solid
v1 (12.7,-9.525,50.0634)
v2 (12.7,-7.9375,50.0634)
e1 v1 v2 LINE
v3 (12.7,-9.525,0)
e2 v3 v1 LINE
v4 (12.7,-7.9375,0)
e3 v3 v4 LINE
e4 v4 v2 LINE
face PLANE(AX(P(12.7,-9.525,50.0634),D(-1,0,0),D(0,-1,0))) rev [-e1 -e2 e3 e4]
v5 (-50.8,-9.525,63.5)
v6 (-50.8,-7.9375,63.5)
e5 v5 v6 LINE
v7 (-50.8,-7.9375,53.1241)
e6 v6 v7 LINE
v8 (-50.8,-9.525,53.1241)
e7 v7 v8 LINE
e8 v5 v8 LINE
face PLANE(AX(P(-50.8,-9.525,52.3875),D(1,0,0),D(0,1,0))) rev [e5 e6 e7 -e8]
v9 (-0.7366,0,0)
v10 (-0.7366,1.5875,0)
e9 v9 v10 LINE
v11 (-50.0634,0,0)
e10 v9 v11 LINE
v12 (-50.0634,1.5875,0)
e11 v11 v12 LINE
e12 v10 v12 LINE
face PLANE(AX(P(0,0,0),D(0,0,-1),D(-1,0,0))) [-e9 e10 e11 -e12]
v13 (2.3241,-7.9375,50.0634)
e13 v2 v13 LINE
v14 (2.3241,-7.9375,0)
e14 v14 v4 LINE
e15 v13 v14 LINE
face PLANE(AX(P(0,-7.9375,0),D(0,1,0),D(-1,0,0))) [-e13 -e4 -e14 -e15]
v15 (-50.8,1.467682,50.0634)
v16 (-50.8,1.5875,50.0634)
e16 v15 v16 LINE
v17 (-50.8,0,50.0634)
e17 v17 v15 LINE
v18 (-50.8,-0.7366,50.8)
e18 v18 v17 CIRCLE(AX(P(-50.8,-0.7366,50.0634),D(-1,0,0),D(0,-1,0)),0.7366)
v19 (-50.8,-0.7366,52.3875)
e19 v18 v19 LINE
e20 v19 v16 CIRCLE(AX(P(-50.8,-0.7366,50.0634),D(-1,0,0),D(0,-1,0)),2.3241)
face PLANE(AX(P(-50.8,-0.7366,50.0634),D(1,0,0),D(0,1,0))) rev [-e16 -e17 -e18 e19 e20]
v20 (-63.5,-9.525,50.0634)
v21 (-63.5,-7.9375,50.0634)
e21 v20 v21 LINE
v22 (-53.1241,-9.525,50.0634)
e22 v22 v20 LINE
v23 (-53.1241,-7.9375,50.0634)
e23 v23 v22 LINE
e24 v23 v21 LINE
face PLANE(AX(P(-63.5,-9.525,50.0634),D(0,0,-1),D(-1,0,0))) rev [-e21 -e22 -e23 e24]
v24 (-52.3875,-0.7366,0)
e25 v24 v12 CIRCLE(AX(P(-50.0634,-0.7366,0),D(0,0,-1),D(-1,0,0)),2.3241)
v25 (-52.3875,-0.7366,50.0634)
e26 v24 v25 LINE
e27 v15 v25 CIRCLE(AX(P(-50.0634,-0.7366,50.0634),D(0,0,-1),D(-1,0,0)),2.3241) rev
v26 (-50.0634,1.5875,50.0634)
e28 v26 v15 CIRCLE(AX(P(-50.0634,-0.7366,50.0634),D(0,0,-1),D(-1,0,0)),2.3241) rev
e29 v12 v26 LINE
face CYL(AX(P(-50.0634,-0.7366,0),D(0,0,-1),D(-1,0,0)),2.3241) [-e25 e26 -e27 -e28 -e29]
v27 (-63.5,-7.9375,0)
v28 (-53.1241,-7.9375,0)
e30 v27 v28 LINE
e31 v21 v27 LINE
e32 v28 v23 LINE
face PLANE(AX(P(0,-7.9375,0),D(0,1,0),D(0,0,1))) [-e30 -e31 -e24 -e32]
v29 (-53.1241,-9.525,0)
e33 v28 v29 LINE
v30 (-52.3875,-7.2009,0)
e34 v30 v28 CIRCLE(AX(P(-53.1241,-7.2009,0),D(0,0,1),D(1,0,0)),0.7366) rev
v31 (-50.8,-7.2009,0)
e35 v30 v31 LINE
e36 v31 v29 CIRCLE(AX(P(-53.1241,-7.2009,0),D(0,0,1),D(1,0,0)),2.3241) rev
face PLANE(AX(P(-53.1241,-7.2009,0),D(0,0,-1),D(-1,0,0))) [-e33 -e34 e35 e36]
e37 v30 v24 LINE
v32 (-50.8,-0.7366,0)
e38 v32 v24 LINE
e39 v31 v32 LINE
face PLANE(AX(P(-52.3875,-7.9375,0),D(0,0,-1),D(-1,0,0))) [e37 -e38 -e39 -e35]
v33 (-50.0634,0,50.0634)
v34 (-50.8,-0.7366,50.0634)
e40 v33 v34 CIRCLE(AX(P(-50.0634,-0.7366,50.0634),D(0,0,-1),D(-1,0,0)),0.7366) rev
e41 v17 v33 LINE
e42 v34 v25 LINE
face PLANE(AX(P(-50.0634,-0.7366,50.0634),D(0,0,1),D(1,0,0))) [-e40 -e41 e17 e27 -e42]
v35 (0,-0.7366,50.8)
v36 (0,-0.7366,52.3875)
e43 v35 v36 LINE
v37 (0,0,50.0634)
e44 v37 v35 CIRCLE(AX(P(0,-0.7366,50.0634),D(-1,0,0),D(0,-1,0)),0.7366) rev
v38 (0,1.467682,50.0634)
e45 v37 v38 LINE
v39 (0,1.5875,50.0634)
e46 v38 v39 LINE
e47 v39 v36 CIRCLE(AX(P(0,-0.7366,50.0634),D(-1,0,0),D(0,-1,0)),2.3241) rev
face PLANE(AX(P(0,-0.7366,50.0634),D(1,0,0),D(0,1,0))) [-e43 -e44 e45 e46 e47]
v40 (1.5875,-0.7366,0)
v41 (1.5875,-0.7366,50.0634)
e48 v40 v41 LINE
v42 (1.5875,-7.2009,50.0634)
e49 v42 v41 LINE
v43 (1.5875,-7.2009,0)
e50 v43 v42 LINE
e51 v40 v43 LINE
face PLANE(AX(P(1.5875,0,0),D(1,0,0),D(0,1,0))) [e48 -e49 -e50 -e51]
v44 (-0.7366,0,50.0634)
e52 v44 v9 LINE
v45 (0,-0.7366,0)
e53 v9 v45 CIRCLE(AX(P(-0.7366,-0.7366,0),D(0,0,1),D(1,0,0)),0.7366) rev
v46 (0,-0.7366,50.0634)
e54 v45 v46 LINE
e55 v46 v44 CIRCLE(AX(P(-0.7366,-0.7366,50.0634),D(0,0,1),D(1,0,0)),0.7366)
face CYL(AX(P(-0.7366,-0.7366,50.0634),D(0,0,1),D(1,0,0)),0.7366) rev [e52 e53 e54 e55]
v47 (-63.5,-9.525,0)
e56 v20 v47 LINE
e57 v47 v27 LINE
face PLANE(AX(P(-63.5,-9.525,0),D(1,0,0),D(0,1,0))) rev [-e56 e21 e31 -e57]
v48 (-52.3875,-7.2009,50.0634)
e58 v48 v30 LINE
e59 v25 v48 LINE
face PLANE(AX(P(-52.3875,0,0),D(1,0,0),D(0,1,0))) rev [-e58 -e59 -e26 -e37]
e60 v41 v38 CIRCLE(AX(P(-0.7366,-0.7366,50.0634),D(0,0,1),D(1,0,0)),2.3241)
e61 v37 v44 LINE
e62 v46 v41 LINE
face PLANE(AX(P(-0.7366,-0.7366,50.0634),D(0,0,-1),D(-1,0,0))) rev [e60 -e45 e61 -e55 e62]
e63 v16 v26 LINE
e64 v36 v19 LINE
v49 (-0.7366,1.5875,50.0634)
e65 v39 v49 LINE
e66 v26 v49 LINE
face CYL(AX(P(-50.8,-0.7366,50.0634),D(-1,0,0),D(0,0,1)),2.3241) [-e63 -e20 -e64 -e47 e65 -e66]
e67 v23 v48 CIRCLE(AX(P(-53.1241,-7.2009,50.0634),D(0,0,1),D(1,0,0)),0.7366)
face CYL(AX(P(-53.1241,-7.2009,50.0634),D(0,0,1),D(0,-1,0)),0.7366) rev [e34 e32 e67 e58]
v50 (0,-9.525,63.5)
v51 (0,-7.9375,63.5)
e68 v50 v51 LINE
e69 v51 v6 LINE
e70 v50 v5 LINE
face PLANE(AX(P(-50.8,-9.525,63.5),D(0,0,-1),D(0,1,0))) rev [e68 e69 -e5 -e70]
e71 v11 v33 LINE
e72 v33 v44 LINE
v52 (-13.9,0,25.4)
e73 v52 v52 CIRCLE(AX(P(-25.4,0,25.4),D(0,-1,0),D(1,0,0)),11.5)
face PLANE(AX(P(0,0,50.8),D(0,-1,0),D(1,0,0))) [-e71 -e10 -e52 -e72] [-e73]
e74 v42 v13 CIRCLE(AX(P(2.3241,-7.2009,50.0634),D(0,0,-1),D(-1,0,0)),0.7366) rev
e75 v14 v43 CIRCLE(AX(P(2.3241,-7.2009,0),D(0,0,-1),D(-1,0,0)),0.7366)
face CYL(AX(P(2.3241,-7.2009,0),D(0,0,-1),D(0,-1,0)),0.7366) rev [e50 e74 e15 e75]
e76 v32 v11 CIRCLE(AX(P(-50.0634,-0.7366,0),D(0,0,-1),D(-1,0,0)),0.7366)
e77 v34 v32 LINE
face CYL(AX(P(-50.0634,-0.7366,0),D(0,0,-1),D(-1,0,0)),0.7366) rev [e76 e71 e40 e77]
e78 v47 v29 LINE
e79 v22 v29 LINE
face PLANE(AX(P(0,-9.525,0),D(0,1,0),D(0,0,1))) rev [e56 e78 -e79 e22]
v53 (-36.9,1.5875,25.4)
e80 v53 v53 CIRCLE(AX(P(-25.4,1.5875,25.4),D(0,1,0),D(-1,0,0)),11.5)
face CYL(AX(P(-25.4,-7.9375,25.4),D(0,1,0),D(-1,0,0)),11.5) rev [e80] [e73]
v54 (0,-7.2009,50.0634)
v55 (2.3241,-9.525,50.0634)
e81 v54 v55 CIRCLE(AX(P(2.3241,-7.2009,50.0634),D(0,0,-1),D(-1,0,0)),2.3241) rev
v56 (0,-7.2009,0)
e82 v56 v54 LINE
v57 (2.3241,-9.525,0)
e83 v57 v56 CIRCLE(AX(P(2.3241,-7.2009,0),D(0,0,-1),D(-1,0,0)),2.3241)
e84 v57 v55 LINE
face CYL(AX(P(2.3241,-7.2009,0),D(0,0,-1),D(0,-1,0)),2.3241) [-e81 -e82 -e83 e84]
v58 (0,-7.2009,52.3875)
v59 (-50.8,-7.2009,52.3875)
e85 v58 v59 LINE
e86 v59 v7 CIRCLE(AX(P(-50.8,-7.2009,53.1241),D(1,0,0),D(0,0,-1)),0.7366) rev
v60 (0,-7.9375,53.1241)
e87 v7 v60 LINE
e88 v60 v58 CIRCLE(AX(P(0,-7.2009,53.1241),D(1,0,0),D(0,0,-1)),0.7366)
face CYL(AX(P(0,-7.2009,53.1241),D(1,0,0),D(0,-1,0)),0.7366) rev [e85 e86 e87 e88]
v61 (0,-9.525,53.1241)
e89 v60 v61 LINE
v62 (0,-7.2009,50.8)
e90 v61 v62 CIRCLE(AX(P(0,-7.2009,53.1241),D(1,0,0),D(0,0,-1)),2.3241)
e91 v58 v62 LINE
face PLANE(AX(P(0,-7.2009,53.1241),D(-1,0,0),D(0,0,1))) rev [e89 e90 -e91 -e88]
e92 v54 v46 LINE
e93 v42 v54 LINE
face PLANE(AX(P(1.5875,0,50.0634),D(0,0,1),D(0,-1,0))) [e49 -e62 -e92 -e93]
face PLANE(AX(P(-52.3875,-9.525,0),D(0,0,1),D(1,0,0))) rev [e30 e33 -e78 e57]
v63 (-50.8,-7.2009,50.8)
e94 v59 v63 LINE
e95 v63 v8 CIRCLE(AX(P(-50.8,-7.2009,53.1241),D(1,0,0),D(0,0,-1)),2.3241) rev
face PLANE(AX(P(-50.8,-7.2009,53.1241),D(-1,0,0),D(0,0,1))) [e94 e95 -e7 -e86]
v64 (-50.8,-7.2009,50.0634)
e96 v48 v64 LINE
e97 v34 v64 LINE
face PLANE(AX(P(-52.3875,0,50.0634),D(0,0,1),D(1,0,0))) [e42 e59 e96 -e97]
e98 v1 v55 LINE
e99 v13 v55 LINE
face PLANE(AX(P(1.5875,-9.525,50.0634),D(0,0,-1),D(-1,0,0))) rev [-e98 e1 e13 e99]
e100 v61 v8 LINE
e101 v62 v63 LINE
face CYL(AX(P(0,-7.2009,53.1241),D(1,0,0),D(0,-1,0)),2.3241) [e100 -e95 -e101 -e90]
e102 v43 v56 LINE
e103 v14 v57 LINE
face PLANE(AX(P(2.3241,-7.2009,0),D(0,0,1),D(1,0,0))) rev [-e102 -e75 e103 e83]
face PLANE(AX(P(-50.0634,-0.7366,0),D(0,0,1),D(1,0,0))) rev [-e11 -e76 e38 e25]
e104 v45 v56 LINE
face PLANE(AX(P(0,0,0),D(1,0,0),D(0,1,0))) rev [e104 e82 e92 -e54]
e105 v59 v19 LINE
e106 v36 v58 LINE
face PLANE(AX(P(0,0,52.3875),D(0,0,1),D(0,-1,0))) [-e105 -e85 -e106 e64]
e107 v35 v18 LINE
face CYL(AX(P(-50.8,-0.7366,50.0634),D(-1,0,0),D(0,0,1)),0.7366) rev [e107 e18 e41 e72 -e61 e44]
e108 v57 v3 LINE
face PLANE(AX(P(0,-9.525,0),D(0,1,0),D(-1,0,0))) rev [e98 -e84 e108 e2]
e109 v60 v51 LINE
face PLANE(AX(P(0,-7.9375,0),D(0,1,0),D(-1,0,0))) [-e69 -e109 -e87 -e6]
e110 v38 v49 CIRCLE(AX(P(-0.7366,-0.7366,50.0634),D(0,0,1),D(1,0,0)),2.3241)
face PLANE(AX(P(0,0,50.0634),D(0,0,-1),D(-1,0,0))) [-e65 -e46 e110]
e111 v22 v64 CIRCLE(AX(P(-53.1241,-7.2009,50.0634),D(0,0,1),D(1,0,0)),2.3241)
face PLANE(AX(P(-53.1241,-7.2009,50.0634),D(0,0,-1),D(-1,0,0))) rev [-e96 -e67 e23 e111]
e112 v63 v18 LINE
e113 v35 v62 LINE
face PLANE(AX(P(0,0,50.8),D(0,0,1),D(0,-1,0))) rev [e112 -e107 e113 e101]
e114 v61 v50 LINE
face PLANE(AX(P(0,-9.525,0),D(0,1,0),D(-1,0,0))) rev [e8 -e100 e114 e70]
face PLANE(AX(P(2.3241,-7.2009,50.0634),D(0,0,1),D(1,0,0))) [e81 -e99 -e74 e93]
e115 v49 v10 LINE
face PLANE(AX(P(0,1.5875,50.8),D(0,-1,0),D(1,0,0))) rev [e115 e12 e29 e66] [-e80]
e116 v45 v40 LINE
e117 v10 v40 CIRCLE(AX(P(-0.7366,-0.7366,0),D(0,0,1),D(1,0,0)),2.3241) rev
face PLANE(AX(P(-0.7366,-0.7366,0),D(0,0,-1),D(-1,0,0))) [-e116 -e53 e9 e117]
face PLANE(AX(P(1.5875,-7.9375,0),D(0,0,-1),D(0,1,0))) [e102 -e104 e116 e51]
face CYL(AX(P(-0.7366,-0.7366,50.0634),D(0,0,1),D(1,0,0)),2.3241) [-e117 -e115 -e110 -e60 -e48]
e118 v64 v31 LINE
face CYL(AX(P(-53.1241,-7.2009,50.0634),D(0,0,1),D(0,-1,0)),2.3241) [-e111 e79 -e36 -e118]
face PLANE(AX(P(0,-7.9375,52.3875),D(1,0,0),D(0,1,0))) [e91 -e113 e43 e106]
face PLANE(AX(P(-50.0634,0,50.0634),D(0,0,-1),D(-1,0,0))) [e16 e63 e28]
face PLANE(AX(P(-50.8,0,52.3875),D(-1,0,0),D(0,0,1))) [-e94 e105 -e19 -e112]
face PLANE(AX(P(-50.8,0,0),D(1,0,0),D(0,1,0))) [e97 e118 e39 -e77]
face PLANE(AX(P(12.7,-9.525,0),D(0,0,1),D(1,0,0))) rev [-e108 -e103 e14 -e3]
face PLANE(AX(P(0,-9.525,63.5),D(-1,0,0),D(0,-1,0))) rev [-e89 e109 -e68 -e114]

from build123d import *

# Parameters (mm, degrees)
SKETCH6_W                      = 50.8
SKETCH6_H                      = 1.5875
BASE_FLANGE1_DEPTH             = 50.8
EDGE_FLANGE1_STRIP_W           = 7.8232
EDGE_FLANGE1_STRIP_H           = 1.5875
EDGE_FLANGE1_STRIP_CUT_DEPTH   = 50.8
EDGE_FLANGE1_DEPTH             = 50.8
SKETCH16_R                     = 11.5
CUT_EXTRUDE1_DEPTH             = 74.592226364
EDGE_FLANGE4_STRIP_W           = 7.8232
EDGE_FLANGE4_STRIP_H           = 1.5875
EDGE_FLANGE4_STRIP_CUT_DEPTH   = 50.0634
EDGE_FLANGE4_STRIP_2_W         = 7.8232
EDGE_FLANGE4_STRIP_2_H         = 1.5875
EDGE_FLANGE4_STRIP_CUT_2_DEPTH = 50.0634
EDGE_FLANGE4_DEPTH             = 50.0634
EDGE_FLANGE4_BEND_DEPTH        = 50.0634
EDGE_FLANGE5_STRIP_W           = 7.8232
EDGE_FLANGE5_STRIP_H           = 1.5875
EDGE_FLANGE5_STRIP_CUT_DEPTH   = 50.0634
EDGE_FLANGE5_STRIP_2_W         = 7.8232
EDGE_FLANGE5_STRIP_2_H         = 1.5875
EDGE_FLANGE5_STRIP_CUT_2_DEPTH = 50.0634
EDGE_FLANGE5_DEPTH             = 50.0634
EDGE_FLANGE5_BEND_DEPTH        = 50.0634
EDGE_FLANGE6_STRIP_W           = 7.8232
EDGE_FLANGE6_STRIP_H           = 1.5875
EDGE_FLANGE6_STRIP_CUT_DEPTH   = 50.8
EDGE_FLANGE6_DEPTH             = 50.8


# Sheet-metal steps are written as plain solids
with BuildPart() as part:
    # Sketch6 → Base-Flange1 (new body)
    with BuildSketch(Plane.XY):
        with Locations((-25.4, 0.79375)):
            Rectangle(SKETCH6_W, SKETCH6_H)
    extrude(amount=BASE_FLANGE1_DEPTH)

    # Edge-Flange1 strip (across the edge) → Edge-Flange1 strip cut (cut)
    with BuildSketch(Plane(origin=(0, 0, 50.8), x_dir=(0, 0, -1), z_dir=(-1, 0, 0))):
        with Locations((-3.175, -0.79375)):
            Rectangle(EDGE_FLANGE1_STRIP_W, EDGE_FLANGE1_STRIP_H)
    extrude(amount=EDGE_FLANGE1_STRIP_CUT_DEPTH, mode=Mode.SUBTRACT)

    # Edge-Flange1 section (across the edge) → Edge-Flange1 (add)
    with BuildSketch(Plane(origin=(0, 0, 50.8), x_dir=(0, 0, -1), z_dir=(-1, 0, 0))):
        with BuildLine():
            Line((-1.5875, 0.7366), (-1.5875, 7.9375))
            Line((-1.5875, 7.9375), (0, 7.9375))
            Line((0, 7.9375), (0, 0.7366))
            ThreePointArc((0, 0.7366), (0.215745145, 0.215745145), (0.7366, 0))
            Line((0.7366, 0), (0.7366, -1.5875))
            ThreePointArc((0.7366, -1.5875), (-0.90678687, -0.90678687), (-1.5875, 0.7366))
        make_face()
    extrude(amount=EDGE_FLANGE1_DEPTH)

    # Sketch16 → Cut-Extrude1 (cut, through all)
    with BuildSketch(Plane(origin=(0, 1.5875, 0), x_dir=(1, 0, 0), z_dir=(0, 1, 0))):
        with Locations(Location((-25.4, -25.4, 0), (0, 0, 180))):
            Circle(SKETCH16_R)
    extrude(amount=-CUT_EXTRUDE1_DEPTH, mode=Mode.SUBTRACT)

    # Edge-Flange4 strip (across the edge) → Edge-Flange4 strip cut (cut)
    with BuildSketch(Plane(origin=(0, 0, 0), x_dir=(-1, 0, 0), z_dir=(0, 0, 1))):
        with Locations((-3.175, -0.79375)):
            Rectangle(EDGE_FLANGE4_STRIP_W, EDGE_FLANGE4_STRIP_H)
    extrude(amount=EDGE_FLANGE4_STRIP_CUT_DEPTH, mode=Mode.SUBTRACT)

    # Edge-Flange4 strip 2 (across the edge) → Edge-Flange4 strip cut 2 (cut)
    with BuildSketch(Plane(origin=(-50.8, 0, 50.0634), x_dir=(1, 0, 0), z_dir=(0, 0, -1))):
        with Locations((-3.175, -0.79375)):
            Rectangle(EDGE_FLANGE4_STRIP_2_W, EDGE_FLANGE4_STRIP_2_H)
    extrude(amount=EDGE_FLANGE4_STRIP_CUT_2_DEPTH, mode=Mode.SUBTRACT)

    # Edge-Flange4 section (across the edge) → Edge-Flange4 (add)
    with BuildSketch(Plane(origin=(0, 0, 0), x_dir=(-1, 0, 0), z_dir=(0, 0, 1))):
        with BuildLine():
            Line((-1.5875, 0.7366), (-1.5875, 7.9375))
            Line((-1.5875, 7.9375), (0, 7.9375))
            Line((0, 7.9375), (0, 0.7366))
            ThreePointArc((0, 0.7366), (0.215745145, 0.215745145), (0.7366, 0))
            Line((0.7366, 0), (0.7366, -1.5875))
            ThreePointArc((0.7366, -1.5875), (-0.90678687, -0.90678687), (-1.5875, 0.7366))
        make_face()
    extrude(amount=EDGE_FLANGE4_DEPTH)

    # Edge-Flange4 section 2 (across the edge) → Edge-Flange4 bend (add)
    with BuildSketch(Plane(origin=(-50.8, 0, 50.0634), x_dir=(1, 0, 0), z_dir=(0, 0, -1))):
        with BuildLine():
            Line((-1.5875, 0.7366), (-1.5875, 7.9375))
            Line((-1.5875, 7.9375), (0, 7.9375))
            Line((0, 7.9375), (0, 0.7366))
            ThreePointArc((0, 0.7366), (0.215745145, 0.215745145), (0.7366, 0))
            Line((0.7366, 0), (0.7366, -1.5875))
            ThreePointArc((0.7366, -1.5875), (-0.90678687, -0.90678687), (-1.5875, 0.7366))
        make_face()
    extrude(amount=EDGE_FLANGE4_BEND_DEPTH)

    # Edge-Flange5 strip (across the edge) → Edge-Flange5 strip cut (cut)
    with BuildSketch(Plane(origin=(1.5875, -7.9375, 50.0634), x_dir=(0, 1, 0), z_dir=(0, 0, -1))):
        with Locations((-3.175, -0.79375)):
            Rectangle(EDGE_FLANGE5_STRIP_W, EDGE_FLANGE5_STRIP_H)
    extrude(amount=EDGE_FLANGE5_STRIP_CUT_DEPTH, mode=Mode.SUBTRACT)

    # Edge-Flange5 strip 2 (across the edge) → Edge-Flange5 strip cut 2 (cut)
    with BuildSketch(Plane(origin=(-52.3875, -7.9375, 0), x_dir=(0, 1, 0), z_dir=(0, 0, 1))):
        with Locations((-3.175, -0.79375)):
            Rectangle(EDGE_FLANGE5_STRIP_2_W, EDGE_FLANGE5_STRIP_2_H)
    extrude(amount=EDGE_FLANGE5_STRIP_CUT_2_DEPTH, mode=Mode.SUBTRACT)

    # Edge-Flange5 section (across the edge) → Edge-Flange5 (add)
    with BuildSketch(Plane(origin=(1.5875, -7.9375, 50.0634), x_dir=(0, 1, 0), z_dir=(0, 0, -1))):
        with BuildLine():
            Line((-1.5875, 0.7366), (-1.5875, 11.1125))
            Line((-1.5875, 11.1125), (0, 11.1125))
            Line((0, 11.1125), (0, 0.7366))
            ThreePointArc((0, 0.7366), (0.215745145, 0.215745145), (0.7366, 0))
            Line((0.7366, 0), (0.7366, -1.5875))
            ThreePointArc((0.7366, -1.5875), (-0.90678687, -0.90678687), (-1.5875, 0.7366))
        make_face()
    extrude(amount=EDGE_FLANGE5_DEPTH)

    # Edge-Flange5 section 2 (across the edge) → Edge-Flange5 bend (add)
    with BuildSketch(Plane(origin=(-52.3875, -7.9375, 0), x_dir=(0, 1, 0), z_dir=(0, 0, 1))):
        with BuildLine():
            Line((-1.5875, 0.7366), (-1.5875, 11.1125))
            Line((-1.5875, 11.1125), (0, 11.1125))
            Line((0, 11.1125), (0, 0.7366))
            ThreePointArc((0, 0.7366), (0.215745145, 0.215745145), (0.7366, 0))
            Line((0.7366, 0), (0.7366, -1.5875))
            ThreePointArc((0.7366, -1.5875), (-0.90678687, -0.90678687), (-1.5875, 0.7366))
        make_face()
    extrude(amount=EDGE_FLANGE5_BEND_DEPTH)

    # Edge-Flange6 strip (across the edge) → Edge-Flange6 strip cut (cut)
    with BuildSketch(Plane(origin=(-50.8, -7.9375, 52.3875), x_dir=(0, 1, 0), z_dir=(1, 0, 0))):
        with Locations((-3.175, -0.79375)):
            Rectangle(EDGE_FLANGE6_STRIP_W, EDGE_FLANGE6_STRIP_H)
    extrude(amount=EDGE_FLANGE6_STRIP_CUT_DEPTH, mode=Mode.SUBTRACT)

    # Edge-Flange6 section (across the edge) → Edge-Flange6 (add)
    with BuildSketch(Plane(origin=(-50.8, -7.9375, 52.3875), x_dir=(0, 1, 0), z_dir=(1, 0, 0))):
        with BuildLine():
            Line((-1.5875, 0.7366), (-1.5875, 11.1125))
            Line((-1.5875, 11.1125), (0, 11.1125))
            Line((0, 11.1125), (0, 0.7366))
            ThreePointArc((0, 0.7366), (0.215745145, 0.215745145), (0.7366, 0))
            Line((0.7366, 0), (0.7366, -1.5875))
            ThreePointArc((0.7366, -1.5875), (-0.90678687, -0.90678687), (-1.5875, 0.7366))
        make_face()
    extrude(amount=EDGE_FLANGE6_DEPTH)


solid = part.part
